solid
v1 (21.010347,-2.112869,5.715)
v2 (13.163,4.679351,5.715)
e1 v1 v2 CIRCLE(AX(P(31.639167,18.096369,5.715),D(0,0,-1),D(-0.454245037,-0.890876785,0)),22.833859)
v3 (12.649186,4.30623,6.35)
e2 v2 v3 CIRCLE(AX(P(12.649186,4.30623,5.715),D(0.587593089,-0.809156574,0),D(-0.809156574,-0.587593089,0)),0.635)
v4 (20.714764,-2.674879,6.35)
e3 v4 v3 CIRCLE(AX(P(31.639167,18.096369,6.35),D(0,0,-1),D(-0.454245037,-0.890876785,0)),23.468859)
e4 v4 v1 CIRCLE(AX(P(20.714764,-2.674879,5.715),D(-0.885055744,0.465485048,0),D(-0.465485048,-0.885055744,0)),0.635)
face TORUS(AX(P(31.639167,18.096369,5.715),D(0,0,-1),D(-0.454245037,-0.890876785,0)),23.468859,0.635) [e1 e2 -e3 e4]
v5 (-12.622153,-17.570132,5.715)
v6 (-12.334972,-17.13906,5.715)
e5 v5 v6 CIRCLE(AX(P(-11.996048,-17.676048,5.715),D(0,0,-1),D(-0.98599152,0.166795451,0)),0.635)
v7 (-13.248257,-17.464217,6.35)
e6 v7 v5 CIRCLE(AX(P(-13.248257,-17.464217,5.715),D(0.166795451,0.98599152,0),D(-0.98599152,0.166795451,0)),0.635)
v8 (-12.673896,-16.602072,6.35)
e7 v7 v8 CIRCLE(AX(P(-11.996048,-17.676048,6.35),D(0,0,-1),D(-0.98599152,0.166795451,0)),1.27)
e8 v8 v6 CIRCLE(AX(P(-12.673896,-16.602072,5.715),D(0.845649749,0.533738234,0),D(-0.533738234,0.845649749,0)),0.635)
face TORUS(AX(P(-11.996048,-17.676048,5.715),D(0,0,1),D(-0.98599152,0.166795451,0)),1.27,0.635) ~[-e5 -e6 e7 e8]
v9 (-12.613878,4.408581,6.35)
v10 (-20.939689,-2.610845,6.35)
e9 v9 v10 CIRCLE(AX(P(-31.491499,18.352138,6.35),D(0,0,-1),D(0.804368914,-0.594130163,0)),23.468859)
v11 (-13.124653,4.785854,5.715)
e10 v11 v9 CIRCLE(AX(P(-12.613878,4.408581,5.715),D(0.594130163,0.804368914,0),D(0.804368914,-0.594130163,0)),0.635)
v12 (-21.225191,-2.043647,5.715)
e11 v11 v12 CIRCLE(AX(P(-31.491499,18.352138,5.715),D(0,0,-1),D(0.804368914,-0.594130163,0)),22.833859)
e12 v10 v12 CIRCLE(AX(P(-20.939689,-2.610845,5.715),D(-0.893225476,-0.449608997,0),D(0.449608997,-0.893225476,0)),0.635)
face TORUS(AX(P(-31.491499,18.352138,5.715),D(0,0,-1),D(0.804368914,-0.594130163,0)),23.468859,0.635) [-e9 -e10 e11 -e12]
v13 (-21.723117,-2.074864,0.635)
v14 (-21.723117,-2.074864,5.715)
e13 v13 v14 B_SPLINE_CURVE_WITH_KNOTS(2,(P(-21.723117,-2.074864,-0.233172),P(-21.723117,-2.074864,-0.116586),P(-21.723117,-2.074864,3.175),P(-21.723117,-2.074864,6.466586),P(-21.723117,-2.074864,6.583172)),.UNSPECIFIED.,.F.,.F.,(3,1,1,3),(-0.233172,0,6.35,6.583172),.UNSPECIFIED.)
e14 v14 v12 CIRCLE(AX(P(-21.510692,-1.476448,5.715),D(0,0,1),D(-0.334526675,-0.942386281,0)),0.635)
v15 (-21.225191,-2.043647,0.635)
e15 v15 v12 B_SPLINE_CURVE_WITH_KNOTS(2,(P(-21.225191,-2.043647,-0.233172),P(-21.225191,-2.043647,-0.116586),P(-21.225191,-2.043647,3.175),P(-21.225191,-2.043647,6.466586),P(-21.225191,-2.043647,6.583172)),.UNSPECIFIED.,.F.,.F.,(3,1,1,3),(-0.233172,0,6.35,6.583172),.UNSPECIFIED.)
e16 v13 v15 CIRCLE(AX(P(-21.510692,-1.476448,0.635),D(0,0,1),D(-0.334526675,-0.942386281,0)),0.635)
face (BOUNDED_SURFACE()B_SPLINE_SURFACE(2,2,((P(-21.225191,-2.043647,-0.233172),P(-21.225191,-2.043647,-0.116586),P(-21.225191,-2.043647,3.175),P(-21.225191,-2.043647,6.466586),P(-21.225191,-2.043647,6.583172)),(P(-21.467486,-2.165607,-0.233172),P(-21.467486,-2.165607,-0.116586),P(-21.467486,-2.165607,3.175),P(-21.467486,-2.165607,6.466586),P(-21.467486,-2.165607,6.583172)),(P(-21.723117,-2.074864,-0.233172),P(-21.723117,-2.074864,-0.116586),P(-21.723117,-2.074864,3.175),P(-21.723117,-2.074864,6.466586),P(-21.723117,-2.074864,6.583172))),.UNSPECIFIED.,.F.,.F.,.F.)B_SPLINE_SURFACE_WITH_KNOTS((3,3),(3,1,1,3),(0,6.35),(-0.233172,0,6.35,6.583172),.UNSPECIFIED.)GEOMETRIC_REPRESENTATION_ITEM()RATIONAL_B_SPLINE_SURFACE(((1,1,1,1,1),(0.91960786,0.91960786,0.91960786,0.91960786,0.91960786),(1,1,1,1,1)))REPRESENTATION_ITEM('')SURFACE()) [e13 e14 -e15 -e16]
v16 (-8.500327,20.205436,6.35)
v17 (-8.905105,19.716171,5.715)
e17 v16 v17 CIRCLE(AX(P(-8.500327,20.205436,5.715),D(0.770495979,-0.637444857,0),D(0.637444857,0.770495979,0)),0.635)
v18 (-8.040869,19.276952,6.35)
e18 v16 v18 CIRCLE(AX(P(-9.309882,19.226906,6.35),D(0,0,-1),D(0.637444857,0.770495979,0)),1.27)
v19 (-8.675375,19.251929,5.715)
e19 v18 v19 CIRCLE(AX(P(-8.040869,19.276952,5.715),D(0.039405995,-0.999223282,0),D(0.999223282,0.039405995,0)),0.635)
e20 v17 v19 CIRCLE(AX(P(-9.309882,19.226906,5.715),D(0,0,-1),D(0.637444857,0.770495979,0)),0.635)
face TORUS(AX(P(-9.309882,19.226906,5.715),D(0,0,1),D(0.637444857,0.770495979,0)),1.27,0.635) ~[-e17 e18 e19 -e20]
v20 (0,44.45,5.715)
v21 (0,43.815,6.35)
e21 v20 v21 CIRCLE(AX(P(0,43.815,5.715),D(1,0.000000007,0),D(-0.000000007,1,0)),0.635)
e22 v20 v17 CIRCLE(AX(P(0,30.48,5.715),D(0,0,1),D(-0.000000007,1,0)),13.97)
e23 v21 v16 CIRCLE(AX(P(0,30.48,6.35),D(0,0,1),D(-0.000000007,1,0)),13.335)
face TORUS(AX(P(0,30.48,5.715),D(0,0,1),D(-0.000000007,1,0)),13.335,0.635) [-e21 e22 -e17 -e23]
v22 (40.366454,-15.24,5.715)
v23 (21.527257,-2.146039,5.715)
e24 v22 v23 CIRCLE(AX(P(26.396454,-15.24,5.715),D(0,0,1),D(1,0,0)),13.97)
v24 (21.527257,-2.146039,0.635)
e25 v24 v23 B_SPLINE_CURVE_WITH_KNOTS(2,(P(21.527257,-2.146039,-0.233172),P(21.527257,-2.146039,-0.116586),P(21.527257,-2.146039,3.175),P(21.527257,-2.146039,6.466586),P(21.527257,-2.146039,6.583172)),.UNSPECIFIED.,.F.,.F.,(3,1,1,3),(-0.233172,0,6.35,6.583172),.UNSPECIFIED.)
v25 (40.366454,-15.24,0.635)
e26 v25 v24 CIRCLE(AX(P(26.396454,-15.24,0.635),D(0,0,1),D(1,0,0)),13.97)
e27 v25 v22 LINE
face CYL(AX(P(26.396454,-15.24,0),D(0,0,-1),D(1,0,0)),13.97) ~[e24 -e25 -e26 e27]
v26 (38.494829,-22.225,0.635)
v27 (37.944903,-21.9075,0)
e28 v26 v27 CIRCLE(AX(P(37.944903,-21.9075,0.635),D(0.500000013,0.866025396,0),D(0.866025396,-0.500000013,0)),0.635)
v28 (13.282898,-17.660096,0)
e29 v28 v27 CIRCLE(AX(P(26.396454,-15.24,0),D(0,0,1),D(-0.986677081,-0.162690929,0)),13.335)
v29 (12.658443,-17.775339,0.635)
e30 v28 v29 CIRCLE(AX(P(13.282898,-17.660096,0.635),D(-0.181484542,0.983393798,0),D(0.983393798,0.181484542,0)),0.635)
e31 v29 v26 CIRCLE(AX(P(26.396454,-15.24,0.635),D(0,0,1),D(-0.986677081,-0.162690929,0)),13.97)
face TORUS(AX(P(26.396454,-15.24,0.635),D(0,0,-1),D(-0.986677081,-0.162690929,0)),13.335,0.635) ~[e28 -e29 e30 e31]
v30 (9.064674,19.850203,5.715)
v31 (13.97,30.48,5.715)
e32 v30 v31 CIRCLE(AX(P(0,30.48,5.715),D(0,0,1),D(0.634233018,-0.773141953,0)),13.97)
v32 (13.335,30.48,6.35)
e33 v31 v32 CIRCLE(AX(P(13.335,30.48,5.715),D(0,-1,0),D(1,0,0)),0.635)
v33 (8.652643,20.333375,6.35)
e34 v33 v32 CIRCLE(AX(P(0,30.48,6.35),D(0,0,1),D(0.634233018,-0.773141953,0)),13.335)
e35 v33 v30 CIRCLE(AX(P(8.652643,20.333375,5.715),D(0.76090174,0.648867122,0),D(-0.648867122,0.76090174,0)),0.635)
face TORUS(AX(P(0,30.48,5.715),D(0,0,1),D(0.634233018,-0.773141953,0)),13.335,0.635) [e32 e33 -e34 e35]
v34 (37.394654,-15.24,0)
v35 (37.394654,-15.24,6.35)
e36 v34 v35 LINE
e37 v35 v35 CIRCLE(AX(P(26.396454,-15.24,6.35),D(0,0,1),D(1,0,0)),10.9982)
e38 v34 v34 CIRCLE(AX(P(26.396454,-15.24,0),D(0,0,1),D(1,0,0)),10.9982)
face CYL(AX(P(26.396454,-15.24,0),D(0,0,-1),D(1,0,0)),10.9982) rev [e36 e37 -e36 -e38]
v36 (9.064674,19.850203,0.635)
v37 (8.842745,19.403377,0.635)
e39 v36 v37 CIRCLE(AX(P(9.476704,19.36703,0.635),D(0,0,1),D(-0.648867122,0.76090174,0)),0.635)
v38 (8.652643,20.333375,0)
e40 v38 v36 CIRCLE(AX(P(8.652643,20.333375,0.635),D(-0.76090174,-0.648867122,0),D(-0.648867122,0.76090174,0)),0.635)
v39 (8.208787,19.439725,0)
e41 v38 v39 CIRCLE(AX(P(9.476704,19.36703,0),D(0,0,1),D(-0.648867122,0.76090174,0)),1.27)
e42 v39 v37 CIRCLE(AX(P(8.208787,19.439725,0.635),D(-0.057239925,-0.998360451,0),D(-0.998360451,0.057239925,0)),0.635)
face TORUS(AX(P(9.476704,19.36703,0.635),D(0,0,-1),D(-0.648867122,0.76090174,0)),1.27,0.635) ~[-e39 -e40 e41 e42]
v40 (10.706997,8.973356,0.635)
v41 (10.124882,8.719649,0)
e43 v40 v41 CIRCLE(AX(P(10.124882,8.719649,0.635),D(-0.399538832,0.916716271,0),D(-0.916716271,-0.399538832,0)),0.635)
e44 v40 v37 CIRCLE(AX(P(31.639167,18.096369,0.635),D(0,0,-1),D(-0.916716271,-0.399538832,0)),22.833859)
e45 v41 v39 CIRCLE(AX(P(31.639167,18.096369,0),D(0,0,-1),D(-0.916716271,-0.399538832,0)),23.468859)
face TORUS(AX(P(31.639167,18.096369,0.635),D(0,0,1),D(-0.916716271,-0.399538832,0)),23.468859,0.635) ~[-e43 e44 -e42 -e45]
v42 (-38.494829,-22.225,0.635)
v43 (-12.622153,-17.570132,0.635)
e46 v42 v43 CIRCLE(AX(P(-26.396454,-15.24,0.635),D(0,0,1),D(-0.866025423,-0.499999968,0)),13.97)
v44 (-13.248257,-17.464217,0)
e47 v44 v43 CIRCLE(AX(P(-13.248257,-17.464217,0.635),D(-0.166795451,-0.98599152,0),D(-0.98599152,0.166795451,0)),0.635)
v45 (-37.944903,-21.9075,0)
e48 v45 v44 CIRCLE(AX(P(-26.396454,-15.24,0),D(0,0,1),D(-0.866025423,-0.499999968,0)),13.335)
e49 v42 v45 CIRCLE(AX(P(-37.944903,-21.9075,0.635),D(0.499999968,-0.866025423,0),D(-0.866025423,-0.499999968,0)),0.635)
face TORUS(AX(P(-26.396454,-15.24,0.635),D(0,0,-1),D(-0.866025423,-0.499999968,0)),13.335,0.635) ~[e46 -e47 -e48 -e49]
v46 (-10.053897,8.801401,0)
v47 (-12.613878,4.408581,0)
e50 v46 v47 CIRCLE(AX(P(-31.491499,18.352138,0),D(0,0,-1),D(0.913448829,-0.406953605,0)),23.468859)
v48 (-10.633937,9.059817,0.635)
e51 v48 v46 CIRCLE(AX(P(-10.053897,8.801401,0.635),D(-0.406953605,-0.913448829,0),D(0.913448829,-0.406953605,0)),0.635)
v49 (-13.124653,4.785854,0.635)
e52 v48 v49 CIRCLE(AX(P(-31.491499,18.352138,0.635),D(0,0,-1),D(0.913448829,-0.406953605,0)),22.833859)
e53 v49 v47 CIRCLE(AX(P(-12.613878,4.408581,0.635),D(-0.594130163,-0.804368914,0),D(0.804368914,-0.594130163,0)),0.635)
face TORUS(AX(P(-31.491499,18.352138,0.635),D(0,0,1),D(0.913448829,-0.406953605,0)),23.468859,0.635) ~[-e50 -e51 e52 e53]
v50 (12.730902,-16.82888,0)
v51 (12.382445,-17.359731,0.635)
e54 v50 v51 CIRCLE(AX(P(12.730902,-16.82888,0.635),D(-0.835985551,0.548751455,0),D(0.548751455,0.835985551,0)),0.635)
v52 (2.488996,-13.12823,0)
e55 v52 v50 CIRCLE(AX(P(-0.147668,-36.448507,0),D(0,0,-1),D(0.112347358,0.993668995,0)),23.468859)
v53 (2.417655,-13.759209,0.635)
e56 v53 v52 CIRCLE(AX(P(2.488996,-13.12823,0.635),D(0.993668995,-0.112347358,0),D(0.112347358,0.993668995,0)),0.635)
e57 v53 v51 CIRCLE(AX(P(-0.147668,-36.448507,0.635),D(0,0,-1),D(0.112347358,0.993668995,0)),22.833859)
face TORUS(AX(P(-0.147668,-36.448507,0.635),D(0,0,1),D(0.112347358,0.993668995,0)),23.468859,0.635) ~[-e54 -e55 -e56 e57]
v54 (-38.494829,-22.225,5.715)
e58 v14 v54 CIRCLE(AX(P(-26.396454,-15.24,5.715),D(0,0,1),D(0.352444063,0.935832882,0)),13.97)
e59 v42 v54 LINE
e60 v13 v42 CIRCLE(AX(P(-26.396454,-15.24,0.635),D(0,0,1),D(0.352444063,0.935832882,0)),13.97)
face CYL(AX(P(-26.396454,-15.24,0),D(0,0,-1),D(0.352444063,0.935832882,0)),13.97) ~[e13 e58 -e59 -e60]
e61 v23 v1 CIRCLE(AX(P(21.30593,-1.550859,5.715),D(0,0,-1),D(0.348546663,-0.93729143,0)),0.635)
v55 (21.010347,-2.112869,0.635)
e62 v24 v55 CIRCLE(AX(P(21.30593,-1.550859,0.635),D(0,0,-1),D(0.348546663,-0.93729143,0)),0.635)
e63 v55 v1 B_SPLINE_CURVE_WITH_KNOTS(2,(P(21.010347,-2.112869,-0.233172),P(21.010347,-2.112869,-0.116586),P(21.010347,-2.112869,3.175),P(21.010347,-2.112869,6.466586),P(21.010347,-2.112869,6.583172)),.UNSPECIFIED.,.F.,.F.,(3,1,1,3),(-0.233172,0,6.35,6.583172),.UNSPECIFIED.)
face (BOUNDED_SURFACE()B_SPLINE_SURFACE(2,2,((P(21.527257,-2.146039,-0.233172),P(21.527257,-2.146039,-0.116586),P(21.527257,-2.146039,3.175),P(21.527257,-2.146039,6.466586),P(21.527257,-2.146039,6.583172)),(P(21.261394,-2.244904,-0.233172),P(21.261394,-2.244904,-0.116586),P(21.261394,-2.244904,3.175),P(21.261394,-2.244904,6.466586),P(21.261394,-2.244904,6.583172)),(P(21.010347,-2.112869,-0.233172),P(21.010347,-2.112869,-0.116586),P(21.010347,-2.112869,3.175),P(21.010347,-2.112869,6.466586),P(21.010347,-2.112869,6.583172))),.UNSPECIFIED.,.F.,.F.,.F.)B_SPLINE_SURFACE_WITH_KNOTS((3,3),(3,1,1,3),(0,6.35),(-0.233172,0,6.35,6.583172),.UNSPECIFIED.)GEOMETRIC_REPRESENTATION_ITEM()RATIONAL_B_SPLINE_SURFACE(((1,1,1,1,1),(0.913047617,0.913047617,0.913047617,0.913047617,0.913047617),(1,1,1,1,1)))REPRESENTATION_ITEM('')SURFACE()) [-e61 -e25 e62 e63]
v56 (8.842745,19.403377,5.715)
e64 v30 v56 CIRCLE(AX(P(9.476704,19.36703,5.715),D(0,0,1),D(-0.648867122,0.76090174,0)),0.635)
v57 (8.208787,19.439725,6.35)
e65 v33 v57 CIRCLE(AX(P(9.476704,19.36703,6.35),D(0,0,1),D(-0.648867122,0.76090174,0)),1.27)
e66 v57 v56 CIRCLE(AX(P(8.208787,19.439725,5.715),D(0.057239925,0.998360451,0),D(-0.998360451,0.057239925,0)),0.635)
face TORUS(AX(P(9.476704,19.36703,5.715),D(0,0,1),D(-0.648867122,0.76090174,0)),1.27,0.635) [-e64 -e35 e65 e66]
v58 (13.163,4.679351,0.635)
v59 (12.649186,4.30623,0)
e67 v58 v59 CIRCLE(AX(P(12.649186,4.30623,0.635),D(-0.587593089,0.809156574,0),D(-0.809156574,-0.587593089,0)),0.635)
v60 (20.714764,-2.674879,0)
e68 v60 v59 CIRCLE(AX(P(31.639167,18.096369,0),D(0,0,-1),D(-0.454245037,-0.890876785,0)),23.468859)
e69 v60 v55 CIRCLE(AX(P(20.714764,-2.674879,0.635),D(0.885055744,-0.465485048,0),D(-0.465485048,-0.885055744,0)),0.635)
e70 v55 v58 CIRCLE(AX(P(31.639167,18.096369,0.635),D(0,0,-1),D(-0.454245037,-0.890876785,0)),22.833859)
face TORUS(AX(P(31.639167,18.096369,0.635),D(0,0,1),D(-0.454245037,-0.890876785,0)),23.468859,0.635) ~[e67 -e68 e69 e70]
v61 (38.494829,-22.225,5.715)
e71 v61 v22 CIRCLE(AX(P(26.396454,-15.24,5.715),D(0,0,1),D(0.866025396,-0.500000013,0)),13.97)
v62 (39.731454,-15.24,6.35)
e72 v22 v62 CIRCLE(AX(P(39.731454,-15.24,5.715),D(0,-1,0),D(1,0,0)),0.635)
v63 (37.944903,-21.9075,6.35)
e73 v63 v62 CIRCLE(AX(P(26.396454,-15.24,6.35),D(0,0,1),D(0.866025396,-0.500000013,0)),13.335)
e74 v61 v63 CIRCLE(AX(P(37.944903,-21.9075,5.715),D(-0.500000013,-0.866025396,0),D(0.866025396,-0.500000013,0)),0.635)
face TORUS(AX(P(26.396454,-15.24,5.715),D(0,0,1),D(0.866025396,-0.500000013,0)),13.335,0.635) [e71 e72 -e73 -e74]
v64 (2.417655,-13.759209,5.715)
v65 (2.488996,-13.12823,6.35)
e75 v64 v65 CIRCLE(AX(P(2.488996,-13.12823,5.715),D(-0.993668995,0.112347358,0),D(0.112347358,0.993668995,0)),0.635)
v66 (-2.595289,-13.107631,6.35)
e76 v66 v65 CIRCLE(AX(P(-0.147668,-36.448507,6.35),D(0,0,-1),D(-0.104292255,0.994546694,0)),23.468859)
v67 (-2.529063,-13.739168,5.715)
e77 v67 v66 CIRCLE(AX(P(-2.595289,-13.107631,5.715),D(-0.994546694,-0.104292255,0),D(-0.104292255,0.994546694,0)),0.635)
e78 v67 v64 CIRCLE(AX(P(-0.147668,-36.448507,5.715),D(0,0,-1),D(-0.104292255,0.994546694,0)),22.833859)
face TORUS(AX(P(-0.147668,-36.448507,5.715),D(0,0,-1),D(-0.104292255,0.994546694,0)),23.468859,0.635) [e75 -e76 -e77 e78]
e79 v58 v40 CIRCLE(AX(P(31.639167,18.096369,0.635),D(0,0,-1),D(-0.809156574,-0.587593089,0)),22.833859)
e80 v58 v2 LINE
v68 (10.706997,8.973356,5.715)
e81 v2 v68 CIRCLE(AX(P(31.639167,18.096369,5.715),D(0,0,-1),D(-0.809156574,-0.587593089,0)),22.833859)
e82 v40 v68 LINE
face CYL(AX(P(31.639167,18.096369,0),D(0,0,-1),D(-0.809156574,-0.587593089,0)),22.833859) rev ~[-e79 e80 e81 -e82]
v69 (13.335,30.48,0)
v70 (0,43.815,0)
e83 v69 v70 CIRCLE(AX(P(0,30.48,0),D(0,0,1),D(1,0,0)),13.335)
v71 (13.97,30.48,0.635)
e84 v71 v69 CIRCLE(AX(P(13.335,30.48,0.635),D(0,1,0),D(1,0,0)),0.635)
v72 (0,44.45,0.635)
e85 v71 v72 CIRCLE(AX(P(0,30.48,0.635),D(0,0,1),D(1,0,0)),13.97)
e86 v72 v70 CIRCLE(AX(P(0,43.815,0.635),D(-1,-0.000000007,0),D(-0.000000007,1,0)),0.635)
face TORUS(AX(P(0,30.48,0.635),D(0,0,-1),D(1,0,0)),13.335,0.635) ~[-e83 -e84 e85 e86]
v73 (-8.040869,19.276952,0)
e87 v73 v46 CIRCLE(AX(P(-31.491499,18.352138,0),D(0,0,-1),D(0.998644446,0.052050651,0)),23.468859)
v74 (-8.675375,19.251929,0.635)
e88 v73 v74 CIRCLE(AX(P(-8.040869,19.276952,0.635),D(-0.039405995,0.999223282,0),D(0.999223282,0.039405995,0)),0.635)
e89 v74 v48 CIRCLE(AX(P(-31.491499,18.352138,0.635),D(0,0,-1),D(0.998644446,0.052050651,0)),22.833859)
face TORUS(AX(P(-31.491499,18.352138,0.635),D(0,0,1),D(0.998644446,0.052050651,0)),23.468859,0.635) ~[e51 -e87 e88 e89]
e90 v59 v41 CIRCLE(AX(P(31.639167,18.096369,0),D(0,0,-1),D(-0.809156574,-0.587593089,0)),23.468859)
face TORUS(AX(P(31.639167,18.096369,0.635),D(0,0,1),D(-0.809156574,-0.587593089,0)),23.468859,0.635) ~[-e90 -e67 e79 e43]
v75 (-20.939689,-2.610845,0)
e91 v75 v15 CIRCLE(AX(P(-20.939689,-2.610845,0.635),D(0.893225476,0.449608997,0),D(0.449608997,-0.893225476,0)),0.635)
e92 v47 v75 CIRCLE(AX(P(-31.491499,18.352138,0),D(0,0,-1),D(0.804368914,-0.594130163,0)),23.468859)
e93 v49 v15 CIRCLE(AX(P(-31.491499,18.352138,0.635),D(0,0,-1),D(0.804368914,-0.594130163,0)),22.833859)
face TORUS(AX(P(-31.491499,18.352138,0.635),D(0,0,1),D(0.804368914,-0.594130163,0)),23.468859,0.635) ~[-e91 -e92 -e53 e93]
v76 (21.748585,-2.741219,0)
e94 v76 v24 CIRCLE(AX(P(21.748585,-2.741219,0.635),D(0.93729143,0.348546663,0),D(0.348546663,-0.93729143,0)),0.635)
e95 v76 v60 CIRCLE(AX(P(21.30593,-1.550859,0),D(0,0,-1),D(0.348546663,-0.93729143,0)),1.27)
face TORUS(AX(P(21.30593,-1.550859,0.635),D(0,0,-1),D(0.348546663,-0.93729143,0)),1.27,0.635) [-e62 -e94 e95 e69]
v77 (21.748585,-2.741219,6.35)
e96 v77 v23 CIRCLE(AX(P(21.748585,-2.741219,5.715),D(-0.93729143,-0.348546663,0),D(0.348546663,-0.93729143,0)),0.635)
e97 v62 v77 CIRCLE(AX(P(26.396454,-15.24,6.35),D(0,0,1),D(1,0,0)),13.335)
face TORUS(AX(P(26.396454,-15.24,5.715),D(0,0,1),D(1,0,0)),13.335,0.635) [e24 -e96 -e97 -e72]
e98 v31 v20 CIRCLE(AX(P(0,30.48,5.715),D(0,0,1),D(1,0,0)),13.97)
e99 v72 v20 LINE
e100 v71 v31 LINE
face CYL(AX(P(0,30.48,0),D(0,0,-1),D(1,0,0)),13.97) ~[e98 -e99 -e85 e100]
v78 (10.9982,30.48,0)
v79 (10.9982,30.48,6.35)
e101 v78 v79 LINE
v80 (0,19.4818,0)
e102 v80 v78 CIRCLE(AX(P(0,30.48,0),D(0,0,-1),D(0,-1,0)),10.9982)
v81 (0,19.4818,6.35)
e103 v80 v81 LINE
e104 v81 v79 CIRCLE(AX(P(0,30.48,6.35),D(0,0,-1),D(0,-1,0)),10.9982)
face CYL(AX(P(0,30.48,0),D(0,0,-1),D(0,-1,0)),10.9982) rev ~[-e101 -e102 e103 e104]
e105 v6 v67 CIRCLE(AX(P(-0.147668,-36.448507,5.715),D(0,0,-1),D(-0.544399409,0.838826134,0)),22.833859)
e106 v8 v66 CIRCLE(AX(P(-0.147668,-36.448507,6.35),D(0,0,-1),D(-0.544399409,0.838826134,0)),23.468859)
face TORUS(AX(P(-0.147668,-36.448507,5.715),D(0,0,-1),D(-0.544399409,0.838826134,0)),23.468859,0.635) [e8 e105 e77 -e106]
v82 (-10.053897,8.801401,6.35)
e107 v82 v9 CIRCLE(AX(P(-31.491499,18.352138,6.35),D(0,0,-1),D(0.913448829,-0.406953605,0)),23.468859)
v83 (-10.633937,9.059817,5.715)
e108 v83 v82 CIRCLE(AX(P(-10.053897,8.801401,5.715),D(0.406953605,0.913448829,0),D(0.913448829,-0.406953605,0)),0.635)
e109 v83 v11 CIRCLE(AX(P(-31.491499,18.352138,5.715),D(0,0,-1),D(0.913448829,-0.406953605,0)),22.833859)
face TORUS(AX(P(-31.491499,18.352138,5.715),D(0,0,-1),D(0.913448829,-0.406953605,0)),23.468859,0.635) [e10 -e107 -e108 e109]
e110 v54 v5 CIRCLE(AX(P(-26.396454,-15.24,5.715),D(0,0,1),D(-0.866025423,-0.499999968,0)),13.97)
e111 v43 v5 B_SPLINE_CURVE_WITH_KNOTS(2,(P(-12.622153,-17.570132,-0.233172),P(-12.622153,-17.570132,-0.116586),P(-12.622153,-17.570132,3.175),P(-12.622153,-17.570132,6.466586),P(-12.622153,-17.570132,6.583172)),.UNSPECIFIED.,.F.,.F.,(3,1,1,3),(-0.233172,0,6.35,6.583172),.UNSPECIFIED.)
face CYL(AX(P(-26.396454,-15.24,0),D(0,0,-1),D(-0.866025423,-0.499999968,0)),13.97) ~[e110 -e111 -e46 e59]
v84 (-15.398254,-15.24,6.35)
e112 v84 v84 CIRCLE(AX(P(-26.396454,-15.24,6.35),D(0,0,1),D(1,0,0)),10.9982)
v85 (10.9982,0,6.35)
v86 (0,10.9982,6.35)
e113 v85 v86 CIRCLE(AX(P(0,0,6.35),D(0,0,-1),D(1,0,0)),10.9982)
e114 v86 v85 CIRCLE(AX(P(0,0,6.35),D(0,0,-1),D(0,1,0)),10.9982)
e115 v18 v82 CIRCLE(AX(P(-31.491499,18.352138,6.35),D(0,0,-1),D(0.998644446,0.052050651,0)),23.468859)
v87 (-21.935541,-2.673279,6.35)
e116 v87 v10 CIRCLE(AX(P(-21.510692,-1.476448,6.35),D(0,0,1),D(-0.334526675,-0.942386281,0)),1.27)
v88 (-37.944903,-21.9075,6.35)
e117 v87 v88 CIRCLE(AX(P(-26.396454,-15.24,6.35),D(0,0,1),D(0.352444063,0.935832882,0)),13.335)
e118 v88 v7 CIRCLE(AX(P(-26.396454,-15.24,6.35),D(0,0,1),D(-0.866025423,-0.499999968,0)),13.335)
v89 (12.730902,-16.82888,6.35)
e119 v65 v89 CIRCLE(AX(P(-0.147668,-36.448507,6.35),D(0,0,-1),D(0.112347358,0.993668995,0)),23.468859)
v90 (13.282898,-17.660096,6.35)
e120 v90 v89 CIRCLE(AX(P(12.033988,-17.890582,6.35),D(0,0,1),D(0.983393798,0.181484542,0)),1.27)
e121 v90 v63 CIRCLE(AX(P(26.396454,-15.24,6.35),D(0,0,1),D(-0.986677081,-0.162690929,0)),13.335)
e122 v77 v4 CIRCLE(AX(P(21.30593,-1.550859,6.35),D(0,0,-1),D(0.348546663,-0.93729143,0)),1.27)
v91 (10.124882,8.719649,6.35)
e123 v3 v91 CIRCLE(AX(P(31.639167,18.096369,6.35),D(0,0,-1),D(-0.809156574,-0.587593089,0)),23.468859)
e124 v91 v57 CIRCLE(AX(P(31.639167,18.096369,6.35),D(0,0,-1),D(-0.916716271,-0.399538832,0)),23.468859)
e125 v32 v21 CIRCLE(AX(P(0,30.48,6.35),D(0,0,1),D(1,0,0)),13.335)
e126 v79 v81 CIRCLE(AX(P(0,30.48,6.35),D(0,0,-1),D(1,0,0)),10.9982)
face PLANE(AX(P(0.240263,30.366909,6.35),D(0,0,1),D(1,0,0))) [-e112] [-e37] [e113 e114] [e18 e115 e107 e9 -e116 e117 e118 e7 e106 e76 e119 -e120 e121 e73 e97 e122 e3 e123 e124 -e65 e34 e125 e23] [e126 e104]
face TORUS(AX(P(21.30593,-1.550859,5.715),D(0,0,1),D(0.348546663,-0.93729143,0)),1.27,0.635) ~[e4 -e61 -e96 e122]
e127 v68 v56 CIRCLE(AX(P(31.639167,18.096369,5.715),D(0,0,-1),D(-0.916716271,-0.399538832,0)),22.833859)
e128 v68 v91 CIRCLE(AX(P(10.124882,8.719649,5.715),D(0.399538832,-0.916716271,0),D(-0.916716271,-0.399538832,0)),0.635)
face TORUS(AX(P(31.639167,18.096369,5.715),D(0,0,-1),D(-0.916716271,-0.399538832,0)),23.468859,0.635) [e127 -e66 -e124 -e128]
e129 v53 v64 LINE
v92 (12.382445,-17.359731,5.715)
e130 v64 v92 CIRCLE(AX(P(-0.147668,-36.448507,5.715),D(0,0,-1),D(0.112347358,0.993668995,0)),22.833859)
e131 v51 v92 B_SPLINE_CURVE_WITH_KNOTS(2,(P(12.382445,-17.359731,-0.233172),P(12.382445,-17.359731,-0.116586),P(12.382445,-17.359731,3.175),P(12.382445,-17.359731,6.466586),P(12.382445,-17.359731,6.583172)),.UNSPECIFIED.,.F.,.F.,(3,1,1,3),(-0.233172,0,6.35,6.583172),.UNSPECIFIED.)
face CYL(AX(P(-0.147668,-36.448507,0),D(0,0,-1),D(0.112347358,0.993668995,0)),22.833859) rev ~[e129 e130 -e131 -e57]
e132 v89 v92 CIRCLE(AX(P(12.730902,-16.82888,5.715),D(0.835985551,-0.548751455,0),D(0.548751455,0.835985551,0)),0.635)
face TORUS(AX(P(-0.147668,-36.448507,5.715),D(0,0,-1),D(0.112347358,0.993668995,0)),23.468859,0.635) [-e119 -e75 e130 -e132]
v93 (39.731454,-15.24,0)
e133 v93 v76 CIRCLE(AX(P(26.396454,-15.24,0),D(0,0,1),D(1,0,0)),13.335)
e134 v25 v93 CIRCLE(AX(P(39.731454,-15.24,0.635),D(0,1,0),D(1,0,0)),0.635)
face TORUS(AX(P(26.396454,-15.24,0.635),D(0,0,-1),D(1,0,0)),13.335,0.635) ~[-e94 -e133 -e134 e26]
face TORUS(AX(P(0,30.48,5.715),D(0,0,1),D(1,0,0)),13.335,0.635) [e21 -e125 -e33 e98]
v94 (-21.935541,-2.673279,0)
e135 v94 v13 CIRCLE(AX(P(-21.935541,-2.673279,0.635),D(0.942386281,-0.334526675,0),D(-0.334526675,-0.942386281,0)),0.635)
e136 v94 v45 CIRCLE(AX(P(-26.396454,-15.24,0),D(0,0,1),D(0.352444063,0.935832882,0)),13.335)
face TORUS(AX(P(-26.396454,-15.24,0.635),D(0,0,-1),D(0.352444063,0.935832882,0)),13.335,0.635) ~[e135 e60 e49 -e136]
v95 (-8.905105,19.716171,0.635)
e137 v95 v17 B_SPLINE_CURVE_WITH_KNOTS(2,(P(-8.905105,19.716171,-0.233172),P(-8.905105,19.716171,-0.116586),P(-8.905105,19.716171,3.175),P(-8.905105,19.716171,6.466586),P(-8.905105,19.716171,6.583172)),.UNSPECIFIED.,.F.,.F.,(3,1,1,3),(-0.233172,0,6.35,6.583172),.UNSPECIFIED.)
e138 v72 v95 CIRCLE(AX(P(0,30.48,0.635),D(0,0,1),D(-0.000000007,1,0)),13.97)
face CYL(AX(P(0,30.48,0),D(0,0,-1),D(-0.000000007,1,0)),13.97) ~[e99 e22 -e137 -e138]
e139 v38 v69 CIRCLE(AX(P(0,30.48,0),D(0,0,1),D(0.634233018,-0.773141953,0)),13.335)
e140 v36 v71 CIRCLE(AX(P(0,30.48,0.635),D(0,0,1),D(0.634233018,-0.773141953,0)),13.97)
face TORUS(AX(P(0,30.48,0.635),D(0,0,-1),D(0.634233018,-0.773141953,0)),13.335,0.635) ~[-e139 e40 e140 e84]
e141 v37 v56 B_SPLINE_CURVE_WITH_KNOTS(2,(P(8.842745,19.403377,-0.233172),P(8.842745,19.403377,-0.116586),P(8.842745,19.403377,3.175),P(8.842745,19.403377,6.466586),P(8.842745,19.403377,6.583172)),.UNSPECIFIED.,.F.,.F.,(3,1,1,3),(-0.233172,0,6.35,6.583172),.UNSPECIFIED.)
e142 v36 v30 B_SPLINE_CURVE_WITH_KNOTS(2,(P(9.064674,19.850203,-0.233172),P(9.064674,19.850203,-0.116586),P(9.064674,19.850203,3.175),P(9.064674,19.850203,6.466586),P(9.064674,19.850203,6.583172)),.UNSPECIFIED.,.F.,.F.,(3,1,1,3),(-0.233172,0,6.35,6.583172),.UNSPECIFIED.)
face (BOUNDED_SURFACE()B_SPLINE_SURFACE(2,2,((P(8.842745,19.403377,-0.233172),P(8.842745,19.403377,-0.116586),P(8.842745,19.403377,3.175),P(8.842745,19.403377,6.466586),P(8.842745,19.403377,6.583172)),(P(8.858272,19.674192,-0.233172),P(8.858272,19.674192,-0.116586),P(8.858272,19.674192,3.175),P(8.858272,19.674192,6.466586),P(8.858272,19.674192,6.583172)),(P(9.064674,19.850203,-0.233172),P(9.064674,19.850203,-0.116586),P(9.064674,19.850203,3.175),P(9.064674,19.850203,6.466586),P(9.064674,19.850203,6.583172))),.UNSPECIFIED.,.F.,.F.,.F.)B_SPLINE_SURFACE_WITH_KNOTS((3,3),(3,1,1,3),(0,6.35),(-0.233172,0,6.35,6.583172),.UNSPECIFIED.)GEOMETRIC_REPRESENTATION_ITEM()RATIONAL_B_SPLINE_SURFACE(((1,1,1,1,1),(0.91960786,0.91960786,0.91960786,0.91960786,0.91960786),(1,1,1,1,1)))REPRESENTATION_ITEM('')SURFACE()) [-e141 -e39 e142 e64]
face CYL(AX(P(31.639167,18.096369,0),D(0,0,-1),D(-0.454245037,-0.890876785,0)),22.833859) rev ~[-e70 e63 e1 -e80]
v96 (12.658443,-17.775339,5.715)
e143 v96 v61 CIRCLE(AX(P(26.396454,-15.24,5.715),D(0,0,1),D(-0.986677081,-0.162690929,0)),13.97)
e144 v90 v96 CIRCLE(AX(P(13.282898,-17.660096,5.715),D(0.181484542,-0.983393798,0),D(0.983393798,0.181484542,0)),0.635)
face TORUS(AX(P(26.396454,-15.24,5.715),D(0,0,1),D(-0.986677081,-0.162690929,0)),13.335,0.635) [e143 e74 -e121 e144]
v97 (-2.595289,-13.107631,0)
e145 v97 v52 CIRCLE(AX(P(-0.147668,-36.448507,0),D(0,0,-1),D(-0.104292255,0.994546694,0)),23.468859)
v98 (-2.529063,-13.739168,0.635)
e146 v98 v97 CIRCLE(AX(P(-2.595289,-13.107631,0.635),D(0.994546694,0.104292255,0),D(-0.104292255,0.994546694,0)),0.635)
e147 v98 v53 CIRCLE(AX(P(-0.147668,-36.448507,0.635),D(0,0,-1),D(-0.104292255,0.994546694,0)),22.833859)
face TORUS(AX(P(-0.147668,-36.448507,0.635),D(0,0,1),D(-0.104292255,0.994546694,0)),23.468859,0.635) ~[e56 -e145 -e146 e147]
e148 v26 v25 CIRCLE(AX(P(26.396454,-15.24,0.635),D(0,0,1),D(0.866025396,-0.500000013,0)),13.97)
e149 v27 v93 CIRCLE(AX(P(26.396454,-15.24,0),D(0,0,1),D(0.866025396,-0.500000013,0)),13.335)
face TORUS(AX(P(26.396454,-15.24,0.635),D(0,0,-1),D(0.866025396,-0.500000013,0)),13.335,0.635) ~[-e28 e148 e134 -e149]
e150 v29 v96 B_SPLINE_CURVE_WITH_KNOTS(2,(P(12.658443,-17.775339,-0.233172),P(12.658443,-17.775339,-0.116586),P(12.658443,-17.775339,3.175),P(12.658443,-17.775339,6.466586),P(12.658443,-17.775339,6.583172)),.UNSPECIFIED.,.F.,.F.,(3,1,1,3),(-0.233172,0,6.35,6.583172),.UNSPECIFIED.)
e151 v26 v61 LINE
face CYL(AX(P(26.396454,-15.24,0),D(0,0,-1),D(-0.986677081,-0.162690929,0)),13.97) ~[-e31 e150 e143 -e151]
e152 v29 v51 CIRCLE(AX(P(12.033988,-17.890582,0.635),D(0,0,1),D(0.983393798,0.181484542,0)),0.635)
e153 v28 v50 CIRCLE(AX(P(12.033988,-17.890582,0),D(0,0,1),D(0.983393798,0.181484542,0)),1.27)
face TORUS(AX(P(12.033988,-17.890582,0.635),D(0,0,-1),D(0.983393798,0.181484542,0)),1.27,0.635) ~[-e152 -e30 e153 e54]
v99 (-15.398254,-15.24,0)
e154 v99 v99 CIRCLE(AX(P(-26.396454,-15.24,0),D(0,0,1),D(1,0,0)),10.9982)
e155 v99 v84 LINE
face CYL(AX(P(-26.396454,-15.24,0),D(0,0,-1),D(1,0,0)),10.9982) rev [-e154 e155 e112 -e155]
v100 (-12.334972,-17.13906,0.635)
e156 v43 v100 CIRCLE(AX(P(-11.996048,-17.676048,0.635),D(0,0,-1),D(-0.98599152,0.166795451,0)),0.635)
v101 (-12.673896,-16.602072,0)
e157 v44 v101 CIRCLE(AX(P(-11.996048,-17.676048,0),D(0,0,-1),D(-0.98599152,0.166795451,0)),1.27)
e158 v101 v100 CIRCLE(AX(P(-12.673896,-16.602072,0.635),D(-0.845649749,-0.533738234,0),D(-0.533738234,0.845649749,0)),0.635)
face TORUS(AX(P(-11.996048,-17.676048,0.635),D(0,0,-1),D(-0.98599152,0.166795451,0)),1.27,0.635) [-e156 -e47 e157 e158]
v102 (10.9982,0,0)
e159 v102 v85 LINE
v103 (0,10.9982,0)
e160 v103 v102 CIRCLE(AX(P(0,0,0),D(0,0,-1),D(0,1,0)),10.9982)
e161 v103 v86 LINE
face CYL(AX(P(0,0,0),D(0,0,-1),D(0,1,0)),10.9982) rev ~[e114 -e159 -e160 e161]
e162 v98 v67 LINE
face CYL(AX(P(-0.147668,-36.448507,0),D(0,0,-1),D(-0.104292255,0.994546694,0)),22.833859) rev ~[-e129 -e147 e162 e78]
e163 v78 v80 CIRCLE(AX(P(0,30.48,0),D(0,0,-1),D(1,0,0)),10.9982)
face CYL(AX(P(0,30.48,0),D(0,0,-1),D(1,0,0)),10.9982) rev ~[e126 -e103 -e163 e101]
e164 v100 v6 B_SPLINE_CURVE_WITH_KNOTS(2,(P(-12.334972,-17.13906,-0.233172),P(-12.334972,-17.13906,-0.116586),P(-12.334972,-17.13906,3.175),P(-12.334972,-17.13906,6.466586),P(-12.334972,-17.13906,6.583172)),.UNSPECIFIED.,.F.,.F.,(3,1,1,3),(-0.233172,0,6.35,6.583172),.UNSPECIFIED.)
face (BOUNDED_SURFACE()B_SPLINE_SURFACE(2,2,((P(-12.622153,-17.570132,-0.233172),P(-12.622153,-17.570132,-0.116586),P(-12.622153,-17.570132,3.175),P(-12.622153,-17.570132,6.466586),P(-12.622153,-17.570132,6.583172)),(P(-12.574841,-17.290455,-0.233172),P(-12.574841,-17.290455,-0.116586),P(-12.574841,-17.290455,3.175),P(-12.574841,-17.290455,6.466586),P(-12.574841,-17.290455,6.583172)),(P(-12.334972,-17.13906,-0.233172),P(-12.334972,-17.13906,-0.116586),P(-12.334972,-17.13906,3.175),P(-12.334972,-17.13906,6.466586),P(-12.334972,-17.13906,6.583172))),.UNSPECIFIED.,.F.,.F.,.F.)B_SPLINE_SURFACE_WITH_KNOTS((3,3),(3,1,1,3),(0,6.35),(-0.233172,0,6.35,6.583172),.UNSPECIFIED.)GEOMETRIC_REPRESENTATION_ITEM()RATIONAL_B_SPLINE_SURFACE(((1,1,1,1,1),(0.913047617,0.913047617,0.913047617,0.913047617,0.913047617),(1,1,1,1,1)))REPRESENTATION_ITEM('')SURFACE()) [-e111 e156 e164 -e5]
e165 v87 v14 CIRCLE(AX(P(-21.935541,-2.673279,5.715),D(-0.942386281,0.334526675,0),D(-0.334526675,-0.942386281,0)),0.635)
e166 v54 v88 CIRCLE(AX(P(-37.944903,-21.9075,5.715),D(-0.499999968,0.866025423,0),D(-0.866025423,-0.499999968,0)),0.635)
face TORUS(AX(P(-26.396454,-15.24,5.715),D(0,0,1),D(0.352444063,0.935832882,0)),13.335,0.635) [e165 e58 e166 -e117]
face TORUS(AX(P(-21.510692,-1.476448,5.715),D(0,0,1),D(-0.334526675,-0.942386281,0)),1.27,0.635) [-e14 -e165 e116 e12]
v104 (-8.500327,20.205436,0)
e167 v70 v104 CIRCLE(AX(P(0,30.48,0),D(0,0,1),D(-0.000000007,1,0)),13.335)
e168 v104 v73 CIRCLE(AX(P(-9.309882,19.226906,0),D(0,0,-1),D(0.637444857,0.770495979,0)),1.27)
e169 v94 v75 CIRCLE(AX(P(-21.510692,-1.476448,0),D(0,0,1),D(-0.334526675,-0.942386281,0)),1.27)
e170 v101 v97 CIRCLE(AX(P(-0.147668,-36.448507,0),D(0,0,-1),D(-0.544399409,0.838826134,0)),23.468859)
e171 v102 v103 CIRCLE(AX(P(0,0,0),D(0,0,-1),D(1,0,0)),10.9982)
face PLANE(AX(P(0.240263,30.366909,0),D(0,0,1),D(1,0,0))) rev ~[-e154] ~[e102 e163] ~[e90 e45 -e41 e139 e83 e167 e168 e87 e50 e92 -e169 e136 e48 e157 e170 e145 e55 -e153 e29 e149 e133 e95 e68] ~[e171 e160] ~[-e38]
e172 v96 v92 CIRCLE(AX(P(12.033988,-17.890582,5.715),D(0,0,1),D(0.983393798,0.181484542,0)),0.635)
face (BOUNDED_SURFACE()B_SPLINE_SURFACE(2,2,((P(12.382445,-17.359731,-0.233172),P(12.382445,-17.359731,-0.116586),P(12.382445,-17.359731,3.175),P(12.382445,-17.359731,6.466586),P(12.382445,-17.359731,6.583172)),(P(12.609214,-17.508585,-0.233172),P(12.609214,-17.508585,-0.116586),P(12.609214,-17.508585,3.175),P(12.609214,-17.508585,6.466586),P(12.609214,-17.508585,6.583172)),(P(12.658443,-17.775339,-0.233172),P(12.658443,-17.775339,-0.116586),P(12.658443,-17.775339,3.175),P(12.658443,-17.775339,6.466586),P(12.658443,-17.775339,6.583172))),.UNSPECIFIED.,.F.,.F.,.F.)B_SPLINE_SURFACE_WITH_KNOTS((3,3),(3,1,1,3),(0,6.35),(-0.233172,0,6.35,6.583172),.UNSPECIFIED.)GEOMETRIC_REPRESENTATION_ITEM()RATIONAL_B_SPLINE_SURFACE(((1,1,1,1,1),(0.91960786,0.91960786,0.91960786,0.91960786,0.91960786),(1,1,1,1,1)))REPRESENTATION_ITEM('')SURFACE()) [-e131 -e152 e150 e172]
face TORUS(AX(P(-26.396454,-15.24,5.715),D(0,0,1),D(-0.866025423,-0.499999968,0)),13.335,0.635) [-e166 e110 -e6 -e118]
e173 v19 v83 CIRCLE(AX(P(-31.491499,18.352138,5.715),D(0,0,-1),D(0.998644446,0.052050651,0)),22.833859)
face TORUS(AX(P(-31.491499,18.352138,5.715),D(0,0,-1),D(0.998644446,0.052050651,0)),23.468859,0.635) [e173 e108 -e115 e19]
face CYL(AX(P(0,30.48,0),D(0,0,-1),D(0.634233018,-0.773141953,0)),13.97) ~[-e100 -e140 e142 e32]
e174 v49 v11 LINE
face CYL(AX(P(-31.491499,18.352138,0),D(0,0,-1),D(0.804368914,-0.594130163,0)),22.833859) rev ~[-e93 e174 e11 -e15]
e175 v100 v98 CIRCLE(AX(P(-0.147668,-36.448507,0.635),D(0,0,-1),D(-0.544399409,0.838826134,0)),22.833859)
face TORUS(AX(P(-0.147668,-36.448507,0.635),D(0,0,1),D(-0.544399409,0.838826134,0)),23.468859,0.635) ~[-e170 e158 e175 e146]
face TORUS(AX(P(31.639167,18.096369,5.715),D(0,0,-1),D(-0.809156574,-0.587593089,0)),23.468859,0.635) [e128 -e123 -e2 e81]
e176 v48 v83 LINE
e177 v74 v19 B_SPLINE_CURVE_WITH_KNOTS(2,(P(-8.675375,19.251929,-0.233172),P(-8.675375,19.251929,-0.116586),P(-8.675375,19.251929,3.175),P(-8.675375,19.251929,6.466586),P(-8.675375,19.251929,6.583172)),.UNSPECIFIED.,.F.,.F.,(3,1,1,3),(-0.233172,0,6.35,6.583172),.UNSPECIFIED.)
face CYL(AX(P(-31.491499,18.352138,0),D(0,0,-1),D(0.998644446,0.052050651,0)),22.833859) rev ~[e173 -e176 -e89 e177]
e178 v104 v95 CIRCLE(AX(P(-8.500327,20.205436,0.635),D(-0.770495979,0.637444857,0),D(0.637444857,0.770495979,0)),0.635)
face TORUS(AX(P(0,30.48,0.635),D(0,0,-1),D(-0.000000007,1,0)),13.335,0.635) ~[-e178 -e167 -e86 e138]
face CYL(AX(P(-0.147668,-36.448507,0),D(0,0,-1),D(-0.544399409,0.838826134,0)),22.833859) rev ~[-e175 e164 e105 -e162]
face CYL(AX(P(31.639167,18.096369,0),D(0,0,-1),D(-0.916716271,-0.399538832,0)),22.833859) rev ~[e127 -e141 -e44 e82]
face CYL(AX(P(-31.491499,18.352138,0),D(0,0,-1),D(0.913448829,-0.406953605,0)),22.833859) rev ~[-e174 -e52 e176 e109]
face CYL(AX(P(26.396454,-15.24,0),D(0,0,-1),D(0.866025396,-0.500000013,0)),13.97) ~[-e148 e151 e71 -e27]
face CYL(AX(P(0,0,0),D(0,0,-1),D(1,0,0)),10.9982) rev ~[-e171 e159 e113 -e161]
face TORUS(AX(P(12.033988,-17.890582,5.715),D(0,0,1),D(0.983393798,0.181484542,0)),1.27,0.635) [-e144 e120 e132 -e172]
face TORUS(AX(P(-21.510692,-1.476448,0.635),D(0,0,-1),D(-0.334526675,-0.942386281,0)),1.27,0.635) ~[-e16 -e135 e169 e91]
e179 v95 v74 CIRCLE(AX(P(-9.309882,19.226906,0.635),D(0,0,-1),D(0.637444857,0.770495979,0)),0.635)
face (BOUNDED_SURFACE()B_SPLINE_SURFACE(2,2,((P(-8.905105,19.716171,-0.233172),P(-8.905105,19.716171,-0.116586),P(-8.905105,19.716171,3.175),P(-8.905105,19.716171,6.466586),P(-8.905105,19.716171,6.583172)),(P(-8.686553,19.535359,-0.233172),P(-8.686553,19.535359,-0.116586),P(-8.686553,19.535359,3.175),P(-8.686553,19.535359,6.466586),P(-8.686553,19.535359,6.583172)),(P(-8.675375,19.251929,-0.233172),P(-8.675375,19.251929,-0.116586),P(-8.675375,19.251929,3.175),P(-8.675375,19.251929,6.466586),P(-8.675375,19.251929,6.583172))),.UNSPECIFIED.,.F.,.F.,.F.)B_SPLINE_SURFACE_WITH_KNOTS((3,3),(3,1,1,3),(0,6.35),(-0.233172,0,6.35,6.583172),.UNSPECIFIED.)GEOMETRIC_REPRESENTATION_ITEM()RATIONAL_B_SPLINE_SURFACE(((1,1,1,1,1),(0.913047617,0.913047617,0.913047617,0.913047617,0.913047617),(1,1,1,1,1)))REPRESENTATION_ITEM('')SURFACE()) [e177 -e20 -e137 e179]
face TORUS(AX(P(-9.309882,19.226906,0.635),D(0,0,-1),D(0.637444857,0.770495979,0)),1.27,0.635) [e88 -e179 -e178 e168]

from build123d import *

# Parameters (mm, degrees)
F0_R     = 10.9982
F1_DEPTH = 6.35
F2_R     = 0.635


with BuildPart() as f1:
    # F0 (on Top) → F1 (new body)
    with BuildSketch(Plane.XY):
        with BuildLine():
            ThreePointArc((13.97, 30.48), (9.8782816978, 40.3582817686), (-1.001e-07, 44.45))
            ThreePointArc((-1.001e-07, 44.45), (-13.1905941087, 35.0809919648), (-8.6885924199, 19.5406553322))
            ThreePointArc((-8.6885924199, 19.5406553322), (-4.6009920121, 17.2894059078), (0, 16.51))
            ThreePointArc((0, 16.51), (4.7049878122, 17.3261416426), (8.8602352549, 19.6792069167))
            ThreePointArc((8.8602352549, 19.6792069167), (12.6281112307, 24.5057463441), (13.97, 30.48))
        make_face()
        with BuildLine():
            ThreePointArc((10.9982, 30.48), (7.7769018008, 22.7030981992), (0, 19.4818))
            ThreePointArc((0, 19.4818), (-7.7769018008, 38.2569018008), (10.9982, 30.48))
        make_face(mode=Mode.SUBTRACT)
        with BuildLine():
            ThreePointArc((12.6125754888, -17.5127922726), (23.8941639919, -28.984069382), (38.4948290898, -22.2250001877))
            ThreePointArc((38.4948290898, -22.2250001877), (39.8904380726, -18.8557021648), (40.3664543073, -15.24))
            ThreePointArc((40.3664543073, -15.24), (34.2546482856, -3.6896888614), (21.2670001342, -2.2457859074))
            ThreePointArc((21.2670001342, -2.2457859074), (14.2433101852, -8.3507338601), (12.6125754888, -17.5127922726))
        make_face()
        with Locations((26.3964543073, -15.24)):
            Circle(F0_R, mode=Mode.SUBTRACT)
        with BuildLine():
            ThreePointArc((-21.4728107437, -2.1664146441), (-37.0480222865, -6.2009182111), (-38.4948294602, -22.2249995463))
            ThreePointArc((-38.4948294602, -22.2249995463), (-23.7857334836, -28.9638856298), (-12.5784077143, -17.2948694248))
            ThreePointArc((-12.5784077143, -17.2948694248), (-12.4644944505, -16.2702400437), (-12.4264543073, -15.24))
            ThreePointArc((-12.4264543073, -15.24), (-14.9085432574, -7.2908617003), (-21.4728107437, -2.1664146441))
        make_face()
        with Locations((-26.3964543073, -15.24)):
            Circle(F0_R, mode=Mode.SUBTRACT)
        with BuildLine():
            ThreePointArc((0, 13.97), (-5.856417794, 12.6831885038), (-10.6339371279, 9.0598168392))
            ThreePointArc((-10.6339371279, 9.0598168392), (-11.7632136635, 6.8551872307), (-13.1246525512, 4.7858536762))
            ThreePointArc((-13.1246525512, 4.7858536762), (-12.126574558, -6.9359274426), (-2.5290629724, -13.7391681146))
            ThreePointArc((-2.5290629724, -13.7391681146), (-0.0551594577, -13.6148354781), (2.4176554132, -13.7592093633))
            ThreePointArc((2.4176554132, -13.7592093633), (10.6989613076, -8.9829353186), (13.97, 0))
            ThreePointArc((13.97, 0), (13.7667717966, 2.3742144594), (13.1630001003, 4.6793512754))
            ThreePointArc((13.1630001003, 4.6793512754), (11.8183731212, 6.7596482474), (10.706997138, 8.9733556871))
            ThreePointArc((10.706997138, 8.9733556871), (5.9077542709, 12.6593577829), (0, 13.97))
        make_face()
        with BuildLine():
            ThreePointArc((10.9982, 0), (-7.7769018008, -7.7769018008), (0, 10.9982))
            ThreePointArc((0, 10.9982), (7.7769018008, 7.7769018008), (10.9982, 0))
        make_face(mode=Mode.SUBTRACT)
        with BuildLine():
            ThreePointArc((0, 16.51), (-4.6009920121, 17.2894059078), (-8.6885924199, 19.5406553322))
            ThreePointArc((-8.6885924199, 19.5406553322), (-9.0410842982, 14.185124608), (-10.6339371279, 9.0598168392))
            ThreePointArc((-10.6339371279, 9.0598168392), (-5.856417794, 12.6831885038), (0, 13.97))
            Line((0, 13.97), (0, 16.51))
        make_face()
        with BuildLine():
            ThreePointArc((10.706997138, 8.9733556871), (9.1376356479, 14.2148495037), (8.8602352549, 19.6792069167))
            ThreePointArc((8.8602352549, 19.6792069167), (4.7049878122, 17.3261416426), (0, 16.51))
            Line((0, 16.51), (0, 13.97))
            ThreePointArc((0, 13.97), (5.9077542709, 12.6593577829), (10.706997138, 8.9733556871))
        make_face()
        with BuildLine():
            ThreePointArc((2.4176554132, -13.7592093633), (7.7416029572, -15.0208493535), (12.6125754888, -17.5127922726))
            ThreePointArc((12.6125754888, -17.5127922726), (14.2433101852, -8.3507338601), (21.2670001342, -2.2457859074))
            ThreePointArc((21.2670001342, -2.2457859074), (16.8052204155, 0.737246376), (13.1630001003, 4.6793512754))
            ThreePointArc((13.1630001003, 4.6793512754), (13.7667717966, 2.3742144594), (13.97, 0))
            ThreePointArc((13.97, 0), (10.6989613076, -8.9829353186), (2.4176554132, -13.7592093633))
        make_face()
        with BuildLine():
            ThreePointArc((-13.1246525512, 4.7858536762), (-16.8792386051, 0.8059998498), (-21.4728107437, -2.1664146441))
            ThreePointArc((-21.4728107437, -2.1664146441), (-14.9085432574, -7.2908617003), (-12.4264543073, -15.24))
            ThreePointArc((-12.4264543073, -15.24), (-12.4644944505, -16.2702400437), (-12.5784077143, -17.2948694248))
            ThreePointArc((-12.5784077143, -17.2948694248), (-7.7641361173, -14.922370984), (-2.5290629724, -13.7391681146))
            ThreePointArc((-2.5290629724, -13.7391681146), (-12.126574558, -6.9359274426), (-13.1246525512, 4.7858536762))
        make_face()
    extrude(amount=F1_DEPTH)

    # F2
    f2_edges = [f1.edges().sort_by_distance(p)[0] for p in [
        (11.766443, 6.850928, 6.35),
        (-11.816299, 6.764575, 6.35),
        (-11.816299, 6.764575, 0),
        (11.766443, 6.850928, 0),
        (0.049856, -13.615502, 0),
        (8.860235, 19.679207, 3.175),
        (-8.688592, 19.540655, 3.175),
        (-0.110293, 44.449565, 0),
        (-0.110293, 44.449565, 6.35),
        (12.612575, -17.512792, 3.175),
        (21.267, -2.245786, 3.175),
        (38.549598, -22.129266, 0),
        (38.549598, -22.129266, 6.35),
        (-21.472811, -2.166415, 3.175),
        (-12.578408, -17.294869, 3.175),
        (-38.439306, -22.320298, 0),
        (-38.439306, -22.320298, 6.35),
        (0.049856, -13.615502, 6.35),
    ]]
    fillet(f2_edges, radius=F2_R)


solid = f1.part
